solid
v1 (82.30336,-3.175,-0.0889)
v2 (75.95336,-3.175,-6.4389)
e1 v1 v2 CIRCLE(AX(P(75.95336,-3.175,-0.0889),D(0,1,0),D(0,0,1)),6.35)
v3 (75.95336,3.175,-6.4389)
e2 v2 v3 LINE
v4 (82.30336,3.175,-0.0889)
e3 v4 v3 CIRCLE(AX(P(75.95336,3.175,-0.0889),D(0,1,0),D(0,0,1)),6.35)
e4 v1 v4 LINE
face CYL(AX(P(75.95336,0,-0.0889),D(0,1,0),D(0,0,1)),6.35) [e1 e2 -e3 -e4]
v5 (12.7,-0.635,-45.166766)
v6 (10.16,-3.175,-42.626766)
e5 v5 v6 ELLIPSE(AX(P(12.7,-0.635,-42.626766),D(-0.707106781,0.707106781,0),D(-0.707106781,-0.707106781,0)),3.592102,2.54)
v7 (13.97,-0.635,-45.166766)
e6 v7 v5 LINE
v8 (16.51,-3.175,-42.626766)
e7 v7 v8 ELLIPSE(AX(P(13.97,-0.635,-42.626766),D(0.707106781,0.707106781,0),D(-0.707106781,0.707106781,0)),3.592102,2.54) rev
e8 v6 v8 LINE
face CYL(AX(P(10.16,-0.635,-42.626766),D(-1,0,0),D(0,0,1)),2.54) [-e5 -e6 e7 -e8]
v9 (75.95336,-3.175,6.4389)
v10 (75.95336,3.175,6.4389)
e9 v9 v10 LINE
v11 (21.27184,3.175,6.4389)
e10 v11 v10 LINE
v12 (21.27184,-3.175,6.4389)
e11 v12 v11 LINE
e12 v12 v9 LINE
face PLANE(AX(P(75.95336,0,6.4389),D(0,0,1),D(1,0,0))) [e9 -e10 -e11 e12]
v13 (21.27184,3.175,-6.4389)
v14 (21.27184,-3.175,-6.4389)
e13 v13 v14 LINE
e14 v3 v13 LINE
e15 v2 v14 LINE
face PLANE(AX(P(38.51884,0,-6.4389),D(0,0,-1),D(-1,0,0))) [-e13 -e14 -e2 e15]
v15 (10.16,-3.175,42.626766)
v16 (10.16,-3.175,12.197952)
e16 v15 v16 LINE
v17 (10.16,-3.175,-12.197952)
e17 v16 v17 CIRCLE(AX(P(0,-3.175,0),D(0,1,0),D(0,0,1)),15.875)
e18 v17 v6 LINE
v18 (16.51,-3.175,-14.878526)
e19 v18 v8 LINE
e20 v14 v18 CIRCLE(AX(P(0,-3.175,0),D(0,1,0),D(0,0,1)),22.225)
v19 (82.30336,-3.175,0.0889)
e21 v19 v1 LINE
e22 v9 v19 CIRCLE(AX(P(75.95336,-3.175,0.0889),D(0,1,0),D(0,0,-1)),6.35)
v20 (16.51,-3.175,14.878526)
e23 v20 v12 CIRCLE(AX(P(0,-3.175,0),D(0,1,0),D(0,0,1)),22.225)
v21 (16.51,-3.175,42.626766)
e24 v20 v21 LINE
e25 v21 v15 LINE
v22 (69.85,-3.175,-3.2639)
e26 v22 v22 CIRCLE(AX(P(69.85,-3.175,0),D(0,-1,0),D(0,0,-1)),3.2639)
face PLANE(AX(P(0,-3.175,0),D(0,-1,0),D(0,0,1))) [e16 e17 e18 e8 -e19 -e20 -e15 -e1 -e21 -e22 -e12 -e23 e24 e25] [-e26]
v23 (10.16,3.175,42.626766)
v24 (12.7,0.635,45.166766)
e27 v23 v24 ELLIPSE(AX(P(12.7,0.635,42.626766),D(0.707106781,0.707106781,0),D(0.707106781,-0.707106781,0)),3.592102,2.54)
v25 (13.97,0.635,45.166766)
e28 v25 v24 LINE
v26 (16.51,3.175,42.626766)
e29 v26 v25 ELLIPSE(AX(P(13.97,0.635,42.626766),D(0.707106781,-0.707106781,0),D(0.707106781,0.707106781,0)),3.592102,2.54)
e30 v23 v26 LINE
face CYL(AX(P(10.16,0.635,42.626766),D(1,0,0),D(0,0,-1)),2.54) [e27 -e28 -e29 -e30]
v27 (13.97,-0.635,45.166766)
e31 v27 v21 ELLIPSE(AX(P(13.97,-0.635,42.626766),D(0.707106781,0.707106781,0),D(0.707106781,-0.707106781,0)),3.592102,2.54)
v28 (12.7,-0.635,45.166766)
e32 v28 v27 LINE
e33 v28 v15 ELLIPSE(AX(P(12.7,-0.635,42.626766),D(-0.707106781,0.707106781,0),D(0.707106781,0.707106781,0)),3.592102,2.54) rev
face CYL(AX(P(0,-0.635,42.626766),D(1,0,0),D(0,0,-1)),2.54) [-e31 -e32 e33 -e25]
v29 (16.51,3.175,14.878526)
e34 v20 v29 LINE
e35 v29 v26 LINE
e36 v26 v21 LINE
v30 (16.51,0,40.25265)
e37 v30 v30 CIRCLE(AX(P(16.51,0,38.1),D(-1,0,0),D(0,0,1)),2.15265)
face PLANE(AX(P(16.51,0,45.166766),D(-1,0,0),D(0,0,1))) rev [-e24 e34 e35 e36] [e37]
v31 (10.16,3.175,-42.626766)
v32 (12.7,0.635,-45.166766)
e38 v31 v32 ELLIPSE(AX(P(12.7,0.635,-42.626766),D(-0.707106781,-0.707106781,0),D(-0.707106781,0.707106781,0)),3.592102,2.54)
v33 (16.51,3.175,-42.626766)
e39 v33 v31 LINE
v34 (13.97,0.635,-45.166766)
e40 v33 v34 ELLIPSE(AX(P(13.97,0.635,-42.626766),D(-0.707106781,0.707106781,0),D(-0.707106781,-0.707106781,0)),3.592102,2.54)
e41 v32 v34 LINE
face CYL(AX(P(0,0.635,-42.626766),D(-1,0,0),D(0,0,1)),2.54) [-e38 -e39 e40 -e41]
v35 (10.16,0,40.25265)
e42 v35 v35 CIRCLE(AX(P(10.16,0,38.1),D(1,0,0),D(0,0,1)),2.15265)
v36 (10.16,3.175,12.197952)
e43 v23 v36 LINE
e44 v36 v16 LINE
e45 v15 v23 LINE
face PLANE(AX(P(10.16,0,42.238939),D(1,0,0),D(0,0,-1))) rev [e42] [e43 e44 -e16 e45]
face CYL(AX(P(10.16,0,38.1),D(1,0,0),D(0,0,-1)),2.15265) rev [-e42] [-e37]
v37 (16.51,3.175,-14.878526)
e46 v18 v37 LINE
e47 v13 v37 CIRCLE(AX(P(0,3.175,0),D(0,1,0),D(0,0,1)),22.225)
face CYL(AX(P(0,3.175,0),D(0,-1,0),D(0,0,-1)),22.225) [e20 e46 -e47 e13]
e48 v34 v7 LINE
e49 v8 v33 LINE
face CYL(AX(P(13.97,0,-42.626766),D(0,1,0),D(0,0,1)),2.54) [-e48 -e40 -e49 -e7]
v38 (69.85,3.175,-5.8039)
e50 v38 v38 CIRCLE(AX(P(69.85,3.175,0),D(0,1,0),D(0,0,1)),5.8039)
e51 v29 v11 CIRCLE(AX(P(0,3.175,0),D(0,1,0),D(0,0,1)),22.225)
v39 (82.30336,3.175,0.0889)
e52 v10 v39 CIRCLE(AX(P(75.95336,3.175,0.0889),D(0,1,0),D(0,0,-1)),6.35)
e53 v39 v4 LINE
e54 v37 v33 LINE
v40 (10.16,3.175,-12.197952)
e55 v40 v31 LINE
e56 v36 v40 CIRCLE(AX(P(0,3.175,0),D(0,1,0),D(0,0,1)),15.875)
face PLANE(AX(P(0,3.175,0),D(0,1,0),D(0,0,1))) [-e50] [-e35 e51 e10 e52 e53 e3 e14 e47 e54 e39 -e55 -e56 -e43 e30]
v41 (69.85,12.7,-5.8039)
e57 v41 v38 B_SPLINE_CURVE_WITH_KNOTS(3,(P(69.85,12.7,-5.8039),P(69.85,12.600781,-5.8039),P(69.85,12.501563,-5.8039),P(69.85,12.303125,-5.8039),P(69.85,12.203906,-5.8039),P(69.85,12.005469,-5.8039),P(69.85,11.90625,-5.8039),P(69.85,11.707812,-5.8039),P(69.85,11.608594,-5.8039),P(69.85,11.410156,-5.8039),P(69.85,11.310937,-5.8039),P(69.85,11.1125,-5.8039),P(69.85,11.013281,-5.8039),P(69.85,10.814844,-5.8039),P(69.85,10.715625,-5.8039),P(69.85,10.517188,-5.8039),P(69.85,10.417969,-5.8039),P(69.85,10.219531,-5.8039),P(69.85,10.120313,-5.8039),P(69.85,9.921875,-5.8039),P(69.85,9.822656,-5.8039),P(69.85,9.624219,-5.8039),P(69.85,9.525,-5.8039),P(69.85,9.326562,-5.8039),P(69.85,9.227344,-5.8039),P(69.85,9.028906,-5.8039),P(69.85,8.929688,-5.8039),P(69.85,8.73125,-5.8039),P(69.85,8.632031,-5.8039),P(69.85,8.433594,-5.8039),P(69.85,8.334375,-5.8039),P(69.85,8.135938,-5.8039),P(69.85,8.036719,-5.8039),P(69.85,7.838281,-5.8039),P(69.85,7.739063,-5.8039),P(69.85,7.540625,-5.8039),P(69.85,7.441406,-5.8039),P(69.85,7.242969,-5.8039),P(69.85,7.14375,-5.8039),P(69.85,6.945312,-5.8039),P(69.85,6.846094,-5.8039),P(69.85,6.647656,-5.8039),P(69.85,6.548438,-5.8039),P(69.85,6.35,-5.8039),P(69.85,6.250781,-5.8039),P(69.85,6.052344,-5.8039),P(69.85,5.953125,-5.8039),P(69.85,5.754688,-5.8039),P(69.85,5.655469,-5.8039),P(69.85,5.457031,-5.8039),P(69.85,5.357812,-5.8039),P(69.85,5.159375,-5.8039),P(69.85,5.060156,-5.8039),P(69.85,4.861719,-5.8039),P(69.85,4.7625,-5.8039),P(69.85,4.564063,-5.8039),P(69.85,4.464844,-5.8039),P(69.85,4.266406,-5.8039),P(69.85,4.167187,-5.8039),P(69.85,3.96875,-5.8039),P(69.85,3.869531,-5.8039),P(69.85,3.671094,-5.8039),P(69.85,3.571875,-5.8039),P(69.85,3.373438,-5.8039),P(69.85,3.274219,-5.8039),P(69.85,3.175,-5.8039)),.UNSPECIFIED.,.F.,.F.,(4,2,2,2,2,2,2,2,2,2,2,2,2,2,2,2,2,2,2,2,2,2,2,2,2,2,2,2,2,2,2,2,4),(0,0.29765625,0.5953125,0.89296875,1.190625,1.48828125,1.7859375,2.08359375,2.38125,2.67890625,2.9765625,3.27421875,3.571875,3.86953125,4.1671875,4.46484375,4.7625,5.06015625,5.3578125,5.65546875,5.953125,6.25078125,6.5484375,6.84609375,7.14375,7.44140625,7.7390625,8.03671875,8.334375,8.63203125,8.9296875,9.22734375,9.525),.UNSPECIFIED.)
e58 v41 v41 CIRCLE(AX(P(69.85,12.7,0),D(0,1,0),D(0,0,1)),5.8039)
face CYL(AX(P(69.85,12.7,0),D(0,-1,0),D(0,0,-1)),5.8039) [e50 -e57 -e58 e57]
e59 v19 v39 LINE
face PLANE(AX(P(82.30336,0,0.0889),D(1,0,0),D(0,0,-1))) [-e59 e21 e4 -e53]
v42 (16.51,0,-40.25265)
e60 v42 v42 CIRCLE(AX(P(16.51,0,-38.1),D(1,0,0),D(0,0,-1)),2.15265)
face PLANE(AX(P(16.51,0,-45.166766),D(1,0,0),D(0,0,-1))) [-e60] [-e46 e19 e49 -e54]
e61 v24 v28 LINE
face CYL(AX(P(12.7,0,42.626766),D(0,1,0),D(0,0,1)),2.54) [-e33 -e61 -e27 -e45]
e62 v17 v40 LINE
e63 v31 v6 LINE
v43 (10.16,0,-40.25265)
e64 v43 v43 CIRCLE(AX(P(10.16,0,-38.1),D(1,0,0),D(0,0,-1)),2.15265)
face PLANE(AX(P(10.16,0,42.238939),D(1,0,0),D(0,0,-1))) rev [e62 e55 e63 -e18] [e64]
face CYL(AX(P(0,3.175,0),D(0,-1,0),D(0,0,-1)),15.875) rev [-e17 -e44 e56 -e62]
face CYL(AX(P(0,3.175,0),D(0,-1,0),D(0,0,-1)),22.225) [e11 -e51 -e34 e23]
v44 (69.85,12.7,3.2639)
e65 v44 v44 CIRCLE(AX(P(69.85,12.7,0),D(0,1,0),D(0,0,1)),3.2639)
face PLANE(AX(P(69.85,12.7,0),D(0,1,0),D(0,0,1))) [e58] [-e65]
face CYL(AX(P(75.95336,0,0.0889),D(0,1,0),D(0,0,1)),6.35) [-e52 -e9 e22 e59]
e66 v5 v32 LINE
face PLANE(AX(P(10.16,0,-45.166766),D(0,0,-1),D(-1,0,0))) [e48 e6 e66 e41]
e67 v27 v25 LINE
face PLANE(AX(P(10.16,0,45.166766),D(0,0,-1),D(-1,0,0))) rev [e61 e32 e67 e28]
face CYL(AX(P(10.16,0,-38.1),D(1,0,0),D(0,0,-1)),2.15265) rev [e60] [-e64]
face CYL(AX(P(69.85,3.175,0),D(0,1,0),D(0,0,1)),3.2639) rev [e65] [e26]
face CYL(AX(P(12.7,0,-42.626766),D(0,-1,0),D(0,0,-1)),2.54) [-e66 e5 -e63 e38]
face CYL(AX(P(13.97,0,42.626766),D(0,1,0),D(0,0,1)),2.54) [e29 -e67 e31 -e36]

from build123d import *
from build123d.topology import SkipClean

# Parameters (mm, degrees)
SKETCH1_R                = 22.225
SKETCH1_R_2              = 15.875
BOSS_EXTRUDE1_DEPTH      = 3.175
BOSS_EXTRUDE2_DEPTH      = 3.175
F_0_257_DIAMETER_HOLE1_D = 6.5278
SKETCH6_W                = 65.552410467
SKETCH6_H                = 82.171101747
CUT_EXTRUDE2_DEPTH       = 86.310457973
BOSS_EXTRUDE3_DEPTH      = 3.175
SKETCH12_R               = 2.15265
CUT_EXTRUDE4_DEPTH       = 80.867912855
SKETCH13_R               = 5.8039
SKETCH13_R_2             = 3.2639
BOSS_EXTRUDE4_DEPTH      = 9.525
MIRROR2_START            = -3.175
MIRROR2_OUTLINE_R        = 3.2639
MIRROR2_DEPTH            = 1.0223499
MIRROR2_START_2          = 12.081931798
MIRROR2_2_OUTLINE_W      = 2.1526501
MIRROR2_2_OUTLINE_H      = 12.8778
MIRROR2_2_DEPTH          = 70.221427729
MIRROR2_START_3          = 10.16
MIRROR2_3_DEPTH          = 11.111840348
MIRROR2_4_DEPTH          = 6.35
MIRROR2_START_4          = -2.1526501
MIRROR2_5_OUTLINE_R      = 3.2639
MIRROR2_5_DEPTH          = 2.1526501
FILLET5_R                = 2.54


with BuildPart() as part:
    # Sketch1 → Boss-Extrude1 (new body)
    with BuildSketch(Plane(origin=(0, 0, 0), x_dir=(1, 0, 0), z_dir=(0, 1, 0))):
        with Locations(Location((0, 0, 0), (0, 0, 270))):
            Circle(SKETCH1_R)
        with Locations(Location((0, 0, 0), (0, 0, 270))):
            Circle(SKETCH1_R_2, mode=Mode.SUBTRACT)
    extrude(amount=BOSS_EXTRUDE1_DEPTH)

    # Sketch2 → Boss-Extrude2 (add)
    with BuildSketch(Plane(origin=(0, 3.175, 0), x_dir=(1, 0, 0), z_dir=(0, 1, 0))):
        with BuildLine():
            Line((75.953359527, -6.4389), (38.518839527, -6.4389))
            Line((38.518839527, -6.4389), (17.590769706, -6.4389))
            Line((17.590769706, -6.4389), (17.590769706, 6.4389))
            Line((17.590769706, 6.4389), (38.518839527, 6.4389))
            Line((38.518839527, 6.4389), (75.953359527, 6.4389))
            ThreePointArc((75.953359527, 6.4389), (80.443487588, 4.579028061), (82.303359527, 0.0889))
            Line((82.303359527, 0.0889), (82.303359527, -0.0889))
            ThreePointArc((82.303359527, -0.0889), (80.443487588, -4.579028061), (75.953359527, -6.4389))
        make_face()
    extrude(amount=-BOSS_EXTRUDE2_DEPTH)

    # F (0.257) Diameter Hole1 (through all)
    with Locations(Plane(origin=(0, 3.175, 0), x_dir=(1, 0, 0), z_dir=(0, 1, 0))):
        with Locations((69.85, 0)):
            Hole(F_0_257_DIAMETER_HOLE1_D / 2)

    # Sketch6 → Cut-Extrude2 (cut, through all)
    with BuildSketch(Plane(origin=(0, 3.175, 0), x_dir=(1, 0, 0), z_dir=(0, 1, 0))):
        with Locations((-22.616205234, -1.153387837)):
            Rectangle(SKETCH6_W, SKETCH6_H)
    extrude(amount=-CUT_EXTRUDE2_DEPTH, mode=Mode.SUBTRACT)

    # Sketch9 → Boss-Extrude3 (add)
    with BuildSketch(Plane(origin=(0, 3.175, 0), x_dir=(1, 0, 0), z_dir=(0, 1, 0))):
        Polygon((10.16, 19.766765669), (10.16, 45.166765669), (16.51, 45.166765669), (16.51, 14.878525633), align=None)
    boss_extrude3 = extrude(amount=-BOSS_EXTRUDE3_DEPTH)

    # Mirror1: Boss-Extrude3 across plane
    add(boss_extrude3.mirror(Plane.XY))

    # Sketch12 → Cut-Extrude4 (cut, through all)
    with BuildSketch(Plane(origin=(16.51, 0, 0), x_dir=(0, 0, -1), z_dir=(1, 0, 0))):
        with Locations((38.1, 0)):
            Circle(SKETCH12_R)
        with Locations((-38.1, 0)):
            Circle(SKETCH12_R)
    extrude(amount=-CUT_EXTRUDE4_DEPTH, mode=Mode.SUBTRACT)

    # Sketch13 → Boss-Extrude4 (add)
    with SkipClean():  # the faces are left unmerged after this step: merging them gives an invalid solid
        with BuildSketch(Plane(origin=(0, 3.175, 0), x_dir=(1, 0, 0), z_dir=(0, 1, 0))):
            with Locations(Location((69.85, 0, 0), (0, 0, 90))):
                Circle(SKETCH13_R)
            with Locations(Location((69.85, 0, 0), (0, 0, 270))):
                Circle(SKETCH13_R_2, mode=Mode.SUBTRACT)
        extrude(amount=BOSS_EXTRUDE4_DEPTH)



with BuildPart() as body_2:
    # Mirror2: read off the stored shape, not the designer's step
    # Mirror2 outline → Mirror2 (new body)
    with BuildSketch(Plane(origin=(0, 0, 0), x_dir=(1, 0, 0), z_dir=(0, 1, 0)).offset(MIRROR2_START)):
        with BuildLine():
            Line((10.16, 45.166765669), (10.16, 12.197951672))
            ThreePointArc((10.16, 12.197951672), (15.875, 0), (10.16, -12.197951672))
            Line((10.16, -12.197951672), (10.16, -45.166765669))
            Line((10.16, -45.166765669), (16.51, -45.166765669))
            Line((16.51, -45.166765669), (16.51, -14.878525633))
            ThreePointArc((16.51, -14.878525633), (19.356489486, -10.921398252), (21.271840348, -6.4389))
            Line((21.271840348, -6.4389), (75.953359527, -6.4389))
            ThreePointArc((75.953359527, -6.4389), (80.443487588, -4.579028061), (82.303359527, -0.0889))
            Line((82.303359527, -0.0889), (82.303359527, 0.0889))
            ThreePointArc((82.303359527, 0.0889), (80.443487588, 4.579028061), (75.953359527, 6.4389))
            Line((75.953359527, 6.4389), (21.271840348, 6.4389))
            ThreePointArc((21.271840348, 6.4389), (19.356489486, 10.921398252), (16.51, 14.878525633))
            Line((16.51, 14.878525633), (16.51, 45.166765669))
            Line((16.51, 45.166765669), (10.16, 45.166765669))
        make_face()
        with Locations((69.85, 0)):
            Circle(MIRROR2_OUTLINE_R, mode=Mode.SUBTRACT)
    extrude(amount=MIRROR2_DEPTH)


with BuildPart() as part_1:
    with SkipClean():  # the faces are left unmerged after this step: merging them gives an invalid solid
        add(part.part)

        add(body_2.part)  # Mirror2 2 merges body 2
        # Mirror2 2 outline → Mirror2 2 (add)
        with BuildSketch(Plane.YZ.offset(MIRROR2_START_2)):
            with Locations((-1.07632505, 0)):
                Rectangle(MIRROR2_2_OUTLINE_W, MIRROR2_2_OUTLINE_H)
        extrude(amount=MIRROR2_2_DEPTH)

    # Mirror2 3 outline → Mirror2 3 (add)
    with SkipClean():  # the faces are left unmerged after this step: merging them gives an invalid solid
        with BuildSketch(Plane.YZ.offset(MIRROR2_START_3)):
            with BuildLine():
                Line((0, -6.4389), (-2.1526501, -6.4389))
                Line((-2.1526501, -6.4389), (-2.15265, -38.1))
                ThreePointArc((-2.15265, -38.1), (-1.522153413, -36.577846587), (0, -35.94735))
                Line((0, -35.94735), (0, -6.4389))
            make_face()
            with BuildLine():
                Line((-2.15265, 38.1), (-2.1526501, 6.4389))
                Line((-2.1526501, 6.4389), (0, 6.4389))
                Line((0, 6.4389), (0, 35.94735))
                ThreePointArc((0, 35.94735), (-1.522153413, 36.577846587), (-2.15265, 38.1))
            make_face()
        extrude(amount=MIRROR2_3_DEPTH)

    # Mirror2 4 outline → Mirror2 4 (add)
    with SkipClean():  # the faces are left unmerged after this step: merging them gives an invalid solid
        with BuildSketch(Plane.YZ.offset(MIRROR2_START_3)):
            with BuildLine():
                ThreePointArc((0, -40.25265), (-1.522153413, -39.622153413), (-2.15265, -38.1))
                Line((-2.15265, -38.1), (-2.1526501, -45.166765669))
                Line((-2.1526501, -45.166765669), (0, -45.166765669))
                Line((0, -45.166765669), (0, -40.25265))
            make_face()
            with BuildLine():
                Line((-2.1526501, 45.166765669), (-2.15265, 38.1))
                ThreePointArc((-2.15265, 38.1), (-1.522153413, 39.622153413), (0, 40.25265))
                Line((0, 40.25265), (0, 45.166765669))
                Line((0, 45.166765669), (-2.1526501, 45.166765669))
            make_face()
        extrude(amount=MIRROR2_4_DEPTH)

    # Mirror2 5 outline → Mirror2 5 (cut)
    with BuildSketch(Plane(origin=(0, 0, 0), x_dir=(1, 0, 0), z_dir=(0, 1, 0)).offset(MIRROR2_START_4)):
        with BuildLine():
            Line((16.51, 40), (16.51, 14.878525633))
            ThreePointArc((16.51, 14.878525633), (19.356489486, 10.921398252), (21.271840348, 6.4389))
            Line((21.271840348, 6.4389), (21.271840348, 40))
            Line((21.271840348, 40), (16.51, 40))
        make_face()
        with BuildLine():
            Line((82.303359527, 6.4389), (75.953359527, 6.4389))
            ThreePointArc((75.953359527, 6.4389), (80.443487588, 4.579028061), (82.303359527, 0.0889))
            Line((82.303359527, 0.0889), (82.303359527, 6.4389))
        make_face()
        with BuildLine():
            Line((10.16, 6.4389), (12.081931798, 6.4389))
            Line((12.081931798, 6.4389), (12.081931798, -6.4389))
            Line((12.081931798, -6.4389), (10.16, -6.4389))
            Line((10.16, -6.4389), (10.16, -12.197951672))
            ThreePointArc((10.16, -12.197951672), (15.875, 0), (10.16, 12.197951672))
            Line((10.16, 12.197951672), (10.16, 6.4389))
        make_face()
        with BuildLine():
            Line((82.303359527, -6.4389), (82.303359527, -0.0889))
            ThreePointArc((82.303359527, -0.0889), (80.443487588, -4.579028061), (75.953359527, -6.4389))
            Line((75.953359527, -6.4389), (82.303359527, -6.4389))
        make_face()
        with BuildLine():
            Line((21.271840348, -40), (21.271840348, -6.4389))
            ThreePointArc((21.271840348, -6.4389), (19.356489486, -10.921398252), (16.51, -14.878525633))
            Line((16.51, -14.878525633), (16.51, -40))
            Line((16.51, -40), (21.271840348, -40))
        make_face()
        with Locations((69.85, 0)):
            Circle(MIRROR2_5_OUTLINE_R)
    extrude(amount=MIRROR2_5_DEPTH, mode=Mode.SUBTRACT)

    # Fillet5
    fillet5_edges = [part_1.edges().sort_by_distance(p)[0] for p in [
        (13.335, -3.175, -45.166765669),
        (13.335, -3.175, 45.166765669),
        (13.335, 3.175, -45.166765669),
        (10.16, 1.5875, -45.166765669),
        (16.51, 1.5875, -45.166765669),
        (13.335, 3.175, 45.166765669),
        (16.51, 1.5875, 45.166765669),
        (10.16, 1.5875, 45.166765669),
    ]]
    fillet(fillet5_edges, radius=FILLET5_R)


solid = part_1.part
